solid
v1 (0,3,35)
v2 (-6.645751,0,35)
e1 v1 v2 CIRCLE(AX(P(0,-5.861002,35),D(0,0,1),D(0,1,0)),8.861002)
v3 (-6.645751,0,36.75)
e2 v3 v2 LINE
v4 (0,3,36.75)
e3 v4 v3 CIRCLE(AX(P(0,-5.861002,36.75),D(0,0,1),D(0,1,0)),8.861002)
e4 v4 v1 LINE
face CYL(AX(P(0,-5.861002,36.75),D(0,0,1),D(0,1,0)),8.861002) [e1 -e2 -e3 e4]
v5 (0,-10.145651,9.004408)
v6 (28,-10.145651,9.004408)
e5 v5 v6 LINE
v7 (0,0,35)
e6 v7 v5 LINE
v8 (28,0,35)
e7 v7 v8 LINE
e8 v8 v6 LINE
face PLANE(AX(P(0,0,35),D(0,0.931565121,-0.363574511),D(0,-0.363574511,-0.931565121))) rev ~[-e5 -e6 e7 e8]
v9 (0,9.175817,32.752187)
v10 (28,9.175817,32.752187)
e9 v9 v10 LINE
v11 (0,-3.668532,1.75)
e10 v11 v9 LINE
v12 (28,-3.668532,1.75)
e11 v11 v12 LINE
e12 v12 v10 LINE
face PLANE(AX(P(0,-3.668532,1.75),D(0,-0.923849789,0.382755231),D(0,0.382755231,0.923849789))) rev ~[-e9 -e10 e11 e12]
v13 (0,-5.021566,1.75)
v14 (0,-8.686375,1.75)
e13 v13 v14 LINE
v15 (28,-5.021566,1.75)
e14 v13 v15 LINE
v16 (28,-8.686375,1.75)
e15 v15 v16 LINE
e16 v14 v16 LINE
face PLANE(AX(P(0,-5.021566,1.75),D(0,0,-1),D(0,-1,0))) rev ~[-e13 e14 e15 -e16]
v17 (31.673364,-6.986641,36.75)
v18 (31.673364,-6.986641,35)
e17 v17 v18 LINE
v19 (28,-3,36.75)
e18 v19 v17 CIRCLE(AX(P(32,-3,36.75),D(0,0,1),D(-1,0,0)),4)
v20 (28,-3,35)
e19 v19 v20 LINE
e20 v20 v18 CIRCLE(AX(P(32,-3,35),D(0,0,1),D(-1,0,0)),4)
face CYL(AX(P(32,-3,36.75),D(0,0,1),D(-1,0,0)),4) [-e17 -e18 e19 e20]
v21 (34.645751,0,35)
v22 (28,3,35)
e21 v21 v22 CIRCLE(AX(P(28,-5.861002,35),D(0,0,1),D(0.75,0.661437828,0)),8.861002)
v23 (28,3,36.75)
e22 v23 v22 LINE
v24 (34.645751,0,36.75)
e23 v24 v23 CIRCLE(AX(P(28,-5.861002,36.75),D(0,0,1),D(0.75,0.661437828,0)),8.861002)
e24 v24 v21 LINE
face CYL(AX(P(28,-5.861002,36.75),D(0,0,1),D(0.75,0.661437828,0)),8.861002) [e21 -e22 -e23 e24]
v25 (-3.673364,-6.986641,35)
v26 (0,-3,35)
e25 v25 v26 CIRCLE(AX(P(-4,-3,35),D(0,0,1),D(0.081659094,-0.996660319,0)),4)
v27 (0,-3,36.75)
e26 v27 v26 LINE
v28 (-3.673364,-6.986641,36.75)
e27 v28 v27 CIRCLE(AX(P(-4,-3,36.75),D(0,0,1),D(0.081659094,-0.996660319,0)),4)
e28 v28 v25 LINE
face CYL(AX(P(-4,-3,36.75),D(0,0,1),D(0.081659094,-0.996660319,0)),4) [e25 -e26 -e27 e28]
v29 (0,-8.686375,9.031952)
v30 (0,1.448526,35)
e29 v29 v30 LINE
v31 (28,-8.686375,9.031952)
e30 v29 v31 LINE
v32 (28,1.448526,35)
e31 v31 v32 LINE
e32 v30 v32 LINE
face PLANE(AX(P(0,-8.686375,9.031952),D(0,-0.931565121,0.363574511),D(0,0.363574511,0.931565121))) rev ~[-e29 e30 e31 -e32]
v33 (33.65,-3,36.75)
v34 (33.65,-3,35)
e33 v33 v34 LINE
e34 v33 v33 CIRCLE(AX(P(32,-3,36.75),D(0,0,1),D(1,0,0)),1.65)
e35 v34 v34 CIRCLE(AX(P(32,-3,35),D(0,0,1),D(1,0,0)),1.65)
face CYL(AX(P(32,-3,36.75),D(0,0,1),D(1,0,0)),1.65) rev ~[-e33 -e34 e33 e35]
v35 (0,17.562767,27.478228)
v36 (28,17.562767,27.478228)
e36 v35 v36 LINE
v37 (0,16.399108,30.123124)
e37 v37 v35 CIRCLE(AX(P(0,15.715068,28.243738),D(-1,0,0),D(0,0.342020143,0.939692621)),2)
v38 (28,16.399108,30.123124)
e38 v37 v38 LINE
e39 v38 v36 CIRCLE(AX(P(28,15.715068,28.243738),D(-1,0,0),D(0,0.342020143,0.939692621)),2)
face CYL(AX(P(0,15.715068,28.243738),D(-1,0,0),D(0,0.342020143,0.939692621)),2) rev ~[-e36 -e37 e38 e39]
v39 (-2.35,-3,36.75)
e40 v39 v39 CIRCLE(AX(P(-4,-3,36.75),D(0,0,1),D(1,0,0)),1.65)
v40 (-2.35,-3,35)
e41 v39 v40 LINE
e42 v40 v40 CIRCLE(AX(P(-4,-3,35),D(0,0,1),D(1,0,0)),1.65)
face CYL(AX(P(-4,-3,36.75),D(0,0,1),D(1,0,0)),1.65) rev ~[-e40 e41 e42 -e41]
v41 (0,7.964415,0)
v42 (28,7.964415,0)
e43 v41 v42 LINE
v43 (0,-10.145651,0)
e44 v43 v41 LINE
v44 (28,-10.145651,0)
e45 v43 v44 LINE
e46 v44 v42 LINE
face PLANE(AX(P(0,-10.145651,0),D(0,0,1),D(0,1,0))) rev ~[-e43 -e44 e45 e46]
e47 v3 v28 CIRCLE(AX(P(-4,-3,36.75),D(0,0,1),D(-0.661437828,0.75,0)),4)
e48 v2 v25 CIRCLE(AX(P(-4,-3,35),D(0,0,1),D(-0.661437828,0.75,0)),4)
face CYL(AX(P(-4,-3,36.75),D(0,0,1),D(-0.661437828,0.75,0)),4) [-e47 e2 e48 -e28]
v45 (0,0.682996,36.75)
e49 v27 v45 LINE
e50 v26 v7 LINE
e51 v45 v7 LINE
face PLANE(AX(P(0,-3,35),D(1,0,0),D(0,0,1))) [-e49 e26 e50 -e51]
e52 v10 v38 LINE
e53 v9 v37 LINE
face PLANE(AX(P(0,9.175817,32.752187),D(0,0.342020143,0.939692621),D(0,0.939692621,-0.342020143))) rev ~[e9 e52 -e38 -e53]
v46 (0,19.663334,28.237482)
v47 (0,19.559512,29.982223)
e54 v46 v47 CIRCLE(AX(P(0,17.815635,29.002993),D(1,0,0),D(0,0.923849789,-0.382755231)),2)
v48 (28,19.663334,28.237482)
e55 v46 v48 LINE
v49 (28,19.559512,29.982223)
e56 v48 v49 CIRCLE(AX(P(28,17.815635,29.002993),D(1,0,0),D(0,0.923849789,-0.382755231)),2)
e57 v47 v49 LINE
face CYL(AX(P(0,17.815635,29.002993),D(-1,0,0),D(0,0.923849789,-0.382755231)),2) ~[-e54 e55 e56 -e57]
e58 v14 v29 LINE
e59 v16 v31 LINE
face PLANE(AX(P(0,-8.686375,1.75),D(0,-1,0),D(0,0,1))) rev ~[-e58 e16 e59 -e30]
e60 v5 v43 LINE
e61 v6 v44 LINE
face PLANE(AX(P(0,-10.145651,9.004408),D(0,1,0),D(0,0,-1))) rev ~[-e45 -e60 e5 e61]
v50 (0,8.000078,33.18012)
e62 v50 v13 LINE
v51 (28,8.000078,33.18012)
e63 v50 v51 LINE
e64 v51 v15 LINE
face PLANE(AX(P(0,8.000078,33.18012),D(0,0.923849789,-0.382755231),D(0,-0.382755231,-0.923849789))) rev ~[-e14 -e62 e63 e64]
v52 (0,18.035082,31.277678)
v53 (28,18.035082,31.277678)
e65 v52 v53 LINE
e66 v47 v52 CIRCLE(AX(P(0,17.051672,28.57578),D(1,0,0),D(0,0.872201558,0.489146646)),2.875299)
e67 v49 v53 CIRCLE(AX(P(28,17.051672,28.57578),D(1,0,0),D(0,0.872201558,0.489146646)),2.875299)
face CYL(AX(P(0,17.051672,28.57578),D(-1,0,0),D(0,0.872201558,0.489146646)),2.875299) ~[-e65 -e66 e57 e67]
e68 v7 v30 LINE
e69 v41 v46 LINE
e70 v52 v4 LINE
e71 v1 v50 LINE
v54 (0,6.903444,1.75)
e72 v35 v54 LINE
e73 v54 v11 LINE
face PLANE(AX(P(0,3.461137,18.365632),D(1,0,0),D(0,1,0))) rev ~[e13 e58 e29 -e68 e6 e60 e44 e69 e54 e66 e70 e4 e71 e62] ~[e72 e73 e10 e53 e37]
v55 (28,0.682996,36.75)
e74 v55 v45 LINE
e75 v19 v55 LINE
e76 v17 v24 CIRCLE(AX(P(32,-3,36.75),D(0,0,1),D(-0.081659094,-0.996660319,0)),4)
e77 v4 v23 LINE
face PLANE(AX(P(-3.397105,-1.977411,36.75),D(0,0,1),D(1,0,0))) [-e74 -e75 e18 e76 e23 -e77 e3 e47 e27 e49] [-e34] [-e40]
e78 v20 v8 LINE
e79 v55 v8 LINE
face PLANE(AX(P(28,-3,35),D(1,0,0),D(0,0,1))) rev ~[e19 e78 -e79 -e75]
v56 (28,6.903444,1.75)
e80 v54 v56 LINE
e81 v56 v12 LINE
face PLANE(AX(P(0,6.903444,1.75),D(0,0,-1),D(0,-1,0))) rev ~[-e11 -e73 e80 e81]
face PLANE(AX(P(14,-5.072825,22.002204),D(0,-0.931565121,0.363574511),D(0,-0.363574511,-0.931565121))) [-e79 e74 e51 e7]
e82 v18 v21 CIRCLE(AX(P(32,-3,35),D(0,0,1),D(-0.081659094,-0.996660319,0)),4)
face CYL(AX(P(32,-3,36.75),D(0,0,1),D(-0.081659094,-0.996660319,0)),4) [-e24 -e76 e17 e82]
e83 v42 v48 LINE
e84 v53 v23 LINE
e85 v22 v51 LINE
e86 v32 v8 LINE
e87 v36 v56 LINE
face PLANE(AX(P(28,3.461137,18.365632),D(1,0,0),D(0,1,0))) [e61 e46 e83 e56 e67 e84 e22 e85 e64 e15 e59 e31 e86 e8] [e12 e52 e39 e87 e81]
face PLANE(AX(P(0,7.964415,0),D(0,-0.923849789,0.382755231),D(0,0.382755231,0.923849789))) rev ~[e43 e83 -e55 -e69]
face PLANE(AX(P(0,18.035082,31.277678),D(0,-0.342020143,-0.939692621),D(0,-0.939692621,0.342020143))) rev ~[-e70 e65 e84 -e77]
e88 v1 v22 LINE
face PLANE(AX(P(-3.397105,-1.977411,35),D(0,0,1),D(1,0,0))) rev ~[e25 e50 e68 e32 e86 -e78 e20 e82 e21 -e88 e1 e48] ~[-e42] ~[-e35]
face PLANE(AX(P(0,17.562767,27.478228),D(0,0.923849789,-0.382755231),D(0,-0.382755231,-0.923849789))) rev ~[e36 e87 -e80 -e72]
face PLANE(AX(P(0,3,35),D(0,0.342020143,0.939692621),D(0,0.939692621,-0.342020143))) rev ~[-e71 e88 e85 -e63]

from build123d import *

# Parameters (mm, degrees)
F1_DEPTH   = 28
F2_R       = 1.65
F3_DEPTH   = 1.75
F1_FACE1_W = 28
F1_FACE1_H = 1.75
F4_REACH   = 50.8712690127


with BuildPart() as f1:
    # F0 (on Right) → F1 (new body)
    with BuildSketch(Plane.YZ):
        with BuildLine():
            Line((-3, 35), (0, 35))
            Line((0, 35), (-10.1456508905, 9.0044083693))
            Line((-10.1456508905, 9.0044083693), (-10.1456508905, 0))
            Line((-10.1456508905, 0), (7.9644151033, 0))
            Line((7.9644151033, 0), (19.6633343933, 28.2374824987))
            ThreePointArc((19.6633343933, 28.2374824987), (19.8121032451, 29.121794497), (19.559512125, 29.9822232317))
            ThreePointArc((19.559512125, 29.9822232317), (18.9135949962, 30.766804474), (18.0350819326, 31.2776777068))
            Line((18.0350819326, 31.2776777068), (3, 36.75))
            Line((3, 36.75), (0, 36.75))
            Line((0, 36.75), (-3, 36.75))
            Line((-3, 36.75), (-3, 35))
        make_face()
        with BuildLine():
            Line((-8.6863745263, 9.0319523177), (1.4485264153, 35))
            Line((1.4485264153, 35), (3, 35))
            Line((3, 35), (8.0000780063, 33.1801204367))
            Line((8.0000780063, 33.1801204367), (9.1758168143, 32.7521865073))
            Line((9.1758168143, 32.7521865073), (16.3991077878, 30.1231235995))
            ThreePointArc((16.3991077878, 30.1231235995), (17.5457217574, 29.0491606036), (17.5627670801, 27.4782278969))
            Line((17.5627670801, 27.4782278969), (6.9034435496, 1.75))
            Line((6.9034435496, 1.75), (-3.6685321031, 1.75))
            Line((-3.6685321031, 1.75), (-5.0215659125, 1.75))
            Line((-5.0215659125, 1.75), (-8.6863745263, 1.75))
            Line((-8.6863745263, 1.75), (-8.6863745263, 9.0319523177))
        make_face(mode=Mode.SUBTRACT)
        Polygon((9.1758168143, 32.7521865073), (8.0000780063, 33.1801204367), (-5.0215659125, 1.75), (-3.6685321031, 1.75), align=None)
    extrude(amount=F1_DEPTH)

    # F2 (on face) → F3 (join)
    with BuildSketch(Plane.XY.offset(36.75)):
        with BuildLine():
            Line((0, -3), (0, 3))
            ThreePointArc((0, 3), (-3.6457513111, 2.215250437), (-6.6457513111, 0))
            ThreePointArc((-6.6457513111, 0), (-7.6807421272, -4.5659302006), (-3.673363624, -6.9866412778))
            ThreePointArc((-3.673363624, -6.9866412778), (-1.0583554341, -5.7104846888), (0, -3))
        make_face()
        with Locations((-4, -3)):
            Circle(F2_R, mode=Mode.SUBTRACT)
        with BuildLine():
            ThreePointArc((34.6457513111, 0), (31.6457513111, 2.215250437), (28, 3))
            Line((28, 3), (28, -3))
            ThreePointArc((28, -3), (29.0583554341, -5.7104846888), (31.673363624, -6.9866412778))
            ThreePointArc((31.673363624, -6.9866412778), (35.6807421272, -4.5659302006), (34.6457513111, 0))
        make_face()
        with Locations((32, -3)):
            Circle(F2_R, mode=Mode.SUBTRACT)
    extrude(amount=-F3_DEPTH)

    f4_end = Plane(origin=(14, -5.0728254453, 22.0022041847), x_dir=(0, -0.3635745105, -0.9315651213), z_dir=(0, -0.9315651213, 0.3635745105))
    # F1_face1 (on face) → F4 (cut, up to a plane its end follows)
    with BuildSketch(Plane(origin=(14, -3, 35.875), x_dir=(1, 0, 0), z_dir=(0, -1, 0))):
        Rectangle(F1_FACE1_W, F1_FACE1_H)
    f4_long = extrude(amount=-F4_REACH, mode=Mode.PRIVATE)
    add(split(f4_long, bisect_by=f4_end, keep=Keep.TOP, mode=Mode.PRIVATE), mode=Mode.SUBTRACT)


solid = f1.part
